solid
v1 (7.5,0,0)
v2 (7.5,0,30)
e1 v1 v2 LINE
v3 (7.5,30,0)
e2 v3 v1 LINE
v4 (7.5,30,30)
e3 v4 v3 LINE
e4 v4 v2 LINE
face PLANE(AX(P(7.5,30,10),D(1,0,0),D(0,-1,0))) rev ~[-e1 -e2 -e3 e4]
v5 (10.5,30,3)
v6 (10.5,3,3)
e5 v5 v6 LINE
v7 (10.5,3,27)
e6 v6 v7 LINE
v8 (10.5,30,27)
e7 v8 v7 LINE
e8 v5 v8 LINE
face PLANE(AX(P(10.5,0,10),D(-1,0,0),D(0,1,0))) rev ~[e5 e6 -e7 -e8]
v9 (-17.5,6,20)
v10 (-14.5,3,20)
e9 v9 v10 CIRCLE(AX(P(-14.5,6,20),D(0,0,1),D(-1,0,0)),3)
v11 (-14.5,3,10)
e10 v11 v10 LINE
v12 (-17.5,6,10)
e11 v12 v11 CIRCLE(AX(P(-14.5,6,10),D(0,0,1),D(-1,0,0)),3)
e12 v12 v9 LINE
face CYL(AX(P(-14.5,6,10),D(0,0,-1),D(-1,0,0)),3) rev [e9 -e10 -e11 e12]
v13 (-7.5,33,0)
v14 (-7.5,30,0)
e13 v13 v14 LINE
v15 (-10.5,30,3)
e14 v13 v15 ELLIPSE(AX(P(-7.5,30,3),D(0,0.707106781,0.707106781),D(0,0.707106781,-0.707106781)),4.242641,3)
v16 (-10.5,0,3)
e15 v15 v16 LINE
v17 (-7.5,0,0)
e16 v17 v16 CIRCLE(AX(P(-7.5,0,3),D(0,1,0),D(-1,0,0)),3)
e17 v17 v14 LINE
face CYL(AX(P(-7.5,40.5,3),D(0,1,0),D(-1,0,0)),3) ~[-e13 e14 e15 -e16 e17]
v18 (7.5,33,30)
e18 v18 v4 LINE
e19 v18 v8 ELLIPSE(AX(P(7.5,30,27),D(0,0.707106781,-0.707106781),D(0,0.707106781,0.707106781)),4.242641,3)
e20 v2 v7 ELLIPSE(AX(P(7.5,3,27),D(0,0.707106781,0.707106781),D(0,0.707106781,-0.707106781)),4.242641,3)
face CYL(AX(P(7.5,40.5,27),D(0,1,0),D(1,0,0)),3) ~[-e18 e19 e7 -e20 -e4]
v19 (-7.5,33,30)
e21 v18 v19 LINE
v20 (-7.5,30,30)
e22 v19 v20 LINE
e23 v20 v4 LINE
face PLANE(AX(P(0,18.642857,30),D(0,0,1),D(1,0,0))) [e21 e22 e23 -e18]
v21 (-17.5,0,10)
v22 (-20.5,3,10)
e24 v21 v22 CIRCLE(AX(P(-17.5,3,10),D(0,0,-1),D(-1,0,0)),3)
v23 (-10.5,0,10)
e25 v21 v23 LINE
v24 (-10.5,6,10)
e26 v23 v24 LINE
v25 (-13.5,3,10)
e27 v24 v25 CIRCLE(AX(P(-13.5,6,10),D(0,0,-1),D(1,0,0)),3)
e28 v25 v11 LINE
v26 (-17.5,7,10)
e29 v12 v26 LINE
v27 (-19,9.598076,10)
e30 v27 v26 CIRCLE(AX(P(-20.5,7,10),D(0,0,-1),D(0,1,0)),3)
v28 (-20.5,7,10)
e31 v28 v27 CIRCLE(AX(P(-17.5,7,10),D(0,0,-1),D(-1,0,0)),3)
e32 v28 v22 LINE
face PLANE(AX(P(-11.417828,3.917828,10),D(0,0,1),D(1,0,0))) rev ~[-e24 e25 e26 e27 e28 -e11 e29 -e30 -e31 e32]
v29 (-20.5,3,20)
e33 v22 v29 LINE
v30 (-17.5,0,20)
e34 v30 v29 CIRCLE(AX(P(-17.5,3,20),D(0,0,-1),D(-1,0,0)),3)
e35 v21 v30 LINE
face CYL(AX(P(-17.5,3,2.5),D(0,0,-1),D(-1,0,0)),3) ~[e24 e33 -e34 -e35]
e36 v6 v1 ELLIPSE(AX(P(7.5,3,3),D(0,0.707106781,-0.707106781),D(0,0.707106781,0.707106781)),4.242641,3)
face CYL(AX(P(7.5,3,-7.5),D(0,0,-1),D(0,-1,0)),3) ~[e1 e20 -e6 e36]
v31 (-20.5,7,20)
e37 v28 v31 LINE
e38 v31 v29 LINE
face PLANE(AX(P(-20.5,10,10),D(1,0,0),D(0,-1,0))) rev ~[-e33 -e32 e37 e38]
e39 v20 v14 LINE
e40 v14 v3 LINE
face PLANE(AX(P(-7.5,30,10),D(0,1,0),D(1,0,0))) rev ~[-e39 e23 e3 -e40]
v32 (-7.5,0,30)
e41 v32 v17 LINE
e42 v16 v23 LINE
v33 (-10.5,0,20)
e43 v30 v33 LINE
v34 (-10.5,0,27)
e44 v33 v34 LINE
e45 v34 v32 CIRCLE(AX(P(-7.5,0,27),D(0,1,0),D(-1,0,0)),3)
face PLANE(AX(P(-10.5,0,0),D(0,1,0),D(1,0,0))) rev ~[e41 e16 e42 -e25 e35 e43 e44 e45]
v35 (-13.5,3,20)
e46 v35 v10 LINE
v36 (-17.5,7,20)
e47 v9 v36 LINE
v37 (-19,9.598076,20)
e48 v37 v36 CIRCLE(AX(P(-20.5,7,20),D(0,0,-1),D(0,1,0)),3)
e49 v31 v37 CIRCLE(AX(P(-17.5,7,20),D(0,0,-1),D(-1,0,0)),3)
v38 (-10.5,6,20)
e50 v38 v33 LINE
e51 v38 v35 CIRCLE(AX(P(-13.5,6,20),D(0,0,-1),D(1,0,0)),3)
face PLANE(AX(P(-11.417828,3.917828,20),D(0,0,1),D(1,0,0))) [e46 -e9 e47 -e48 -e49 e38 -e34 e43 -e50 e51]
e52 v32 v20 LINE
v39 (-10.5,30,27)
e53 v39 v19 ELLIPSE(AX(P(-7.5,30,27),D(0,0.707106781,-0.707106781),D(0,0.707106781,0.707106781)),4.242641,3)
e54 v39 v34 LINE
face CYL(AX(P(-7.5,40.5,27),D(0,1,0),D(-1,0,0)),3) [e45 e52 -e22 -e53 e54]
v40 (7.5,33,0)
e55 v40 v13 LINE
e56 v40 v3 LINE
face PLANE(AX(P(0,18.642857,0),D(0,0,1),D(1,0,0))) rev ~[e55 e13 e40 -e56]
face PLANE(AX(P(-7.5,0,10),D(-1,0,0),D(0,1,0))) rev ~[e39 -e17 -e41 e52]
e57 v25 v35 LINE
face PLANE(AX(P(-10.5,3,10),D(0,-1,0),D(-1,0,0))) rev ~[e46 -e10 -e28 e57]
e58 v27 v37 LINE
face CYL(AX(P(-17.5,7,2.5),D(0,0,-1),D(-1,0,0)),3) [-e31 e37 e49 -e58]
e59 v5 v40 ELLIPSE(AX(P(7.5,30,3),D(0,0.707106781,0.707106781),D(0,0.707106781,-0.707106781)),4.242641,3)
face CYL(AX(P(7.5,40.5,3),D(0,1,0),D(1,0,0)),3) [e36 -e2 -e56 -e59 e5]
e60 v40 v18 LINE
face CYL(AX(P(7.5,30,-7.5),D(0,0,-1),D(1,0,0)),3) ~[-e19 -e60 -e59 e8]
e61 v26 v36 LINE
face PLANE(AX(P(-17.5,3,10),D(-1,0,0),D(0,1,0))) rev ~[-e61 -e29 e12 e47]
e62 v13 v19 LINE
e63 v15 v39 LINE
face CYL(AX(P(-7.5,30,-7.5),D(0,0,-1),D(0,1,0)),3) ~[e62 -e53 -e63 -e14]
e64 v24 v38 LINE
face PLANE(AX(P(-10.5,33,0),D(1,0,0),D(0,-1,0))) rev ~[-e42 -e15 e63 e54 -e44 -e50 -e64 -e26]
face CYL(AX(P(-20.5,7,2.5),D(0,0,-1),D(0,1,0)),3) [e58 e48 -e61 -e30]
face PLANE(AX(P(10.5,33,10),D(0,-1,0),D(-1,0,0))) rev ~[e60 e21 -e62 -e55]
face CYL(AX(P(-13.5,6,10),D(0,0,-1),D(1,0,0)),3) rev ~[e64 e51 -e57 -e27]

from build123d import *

# Parameters (mm, degrees)
F1_DEPTH    = 30
F2_START    = 10
F2_DEPTH    = 10
F3_T1_DEPTH = 10
F3_T3_DEPTH = 25
F3_T5_DEPTH = 48
F3_T7_DEPTH = 45


# Not quite as in the source:
# - a fillet or chamfer that OpenCascade refuses, or shapes differently, is made with other operations: its cross-section is extruded or revolved along the edge and cut away or added


with BuildPart() as f1:
    # F0 (on Top) → F1 (new body)
    with BuildSketch(Plane.XY):
        Polygon((7.5, 30), (7.5, 0), (10.5, 0), (10.5, 33), (-10.5, 33), (-10.5, 3), (-10.5, 0), (-7.5, 0), (-7.5, 30), align=None)
    extrude(amount=F1_DEPTH)

    # F0 (on Top) → F2 (join)
    with BuildSketch(Plane.XY.offset(F2_START)):
        Polygon((7.5, 30), (7.5, 0), (10.5, 0), (10.5, 33), (-10.5, 33), (-10.5, 3), (-10.5, 0), (-7.5, 0), (-7.5, 30), align=None)
        Polygon((-10.5, 0), (-10.5, 3), (-17.5, 3), (-17.5, 10), (-20.5, 10), (-20.5, 0), align=None)
    extrude(amount=F2_DEPTH)

    # F3: fillet of radius 3 on 12 edges, made by hand

    # F3_s2 → F3_t1 (join)
    with BuildSketch(Plane.XY.offset(10)):
        with BuildLine():
            ThreePointArc((-10.5, 6), (-11.3786796564, 3.8786796564), (-13.5, 3))
            Line((-13.5, 3), (-10.5, 3))
            Line((-10.5, 3), (-10.5, 6))
        make_face()
        with BuildLine():
            ThreePointArc((-17.5, 6), (-16.6213203436, 3.8786796564), (-14.5, 3))
            Line((-14.5, 3), (-17.5, 3))
            Line((-17.5, 3), (-17.5, 6))
        make_face()
    extrude(amount=F3_T1_DEPTH)

    # F3_s4 → F3_t3 (cut)
    with BuildSketch(Plane.XY.offset(2.5)):
        with BuildLine():
            ThreePointArc((-20.5, 10), (-18.3786796564, 9.1213203436), (-17.5, 7))
            Line((-17.5, 7), (-17.5, 10))
            Line((-17.5, 10), (-20.5, 10))
        make_face()
        with BuildLine():
            ThreePointArc((-20.5, 3), (-19.6213203436, 0.8786796564), (-17.5, 0))
            Line((-17.5, 0), (-20.5, 0))
            Line((-20.5, 0), (-20.5, 3))
        make_face()
        with BuildLine():
            ThreePointArc((-20.5, 7), (-19.6213203436, 9.1213203436), (-17.5, 10))
            Line((-17.5, 10), (-20.5, 10))
            Line((-20.5, 10), (-20.5, 7))
        make_face()
    extrude(amount=F3_T3_DEPTH, mode=Mode.SUBTRACT)

    # F3_s6 → F3_t5 (cut)
    with BuildSketch(Plane.XZ.offset(-40.5)):
        with BuildLine():
            ThreePointArc((-10.5, 27), (-9.6213203436, 29.1213203436), (-7.5, 30))
            Line((-7.5, 30), (-10.5, 30))
            Line((-10.5, 30), (-10.5, 27))
        make_face()
        with BuildLine():
            ThreePointArc((10.5, 3), (9.6213203436, 0.8786796564), (7.5, 0))
            Line((7.5, 0), (10.5, 0))
            Line((10.5, 0), (10.5, 3))
        make_face()
        with BuildLine():
            ThreePointArc((10.5, 27), (9.6213203436, 29.1213203436), (7.5, 30))
            Line((7.5, 30), (10.5, 30))
            Line((10.5, 30), (10.5, 27))
        make_face()
        with BuildLine():
            ThreePointArc((-10.5, 3), (-9.6213203436, 0.8786796564), (-7.5, 0))
            Line((-7.5, 0), (-10.5, 0))
            Line((-10.5, 0), (-10.5, 3))
        make_face()
    extrude(amount=F3_T5_DEPTH, mode=Mode.SUBTRACT)

    # F3_s8 → F3_t7 (cut)
    with BuildSketch(Plane.XY.offset(-7.5)):
        with BuildLine():
            ThreePointArc((7.5, 0), (9.6213203436, 0.8786796564), (10.5, 3))
            Line((10.5, 3), (10.5, 0))
            Line((10.5, 0), (7.5, 0))
        make_face()
        with BuildLine():
            ThreePointArc((10.5, 30), (9.6213203436, 32.1213203436), (7.5, 33))
            Line((7.5, 33), (10.5, 33))
            Line((10.5, 33), (10.5, 30))
        make_face()
        with BuildLine():
            ThreePointArc((-7.5, 33), (-9.6213203436, 32.1213203436), (-10.5, 30))
            Line((-10.5, 30), (-10.5, 33))
            Line((-10.5, 33), (-7.5, 33))
        make_face()
    extrude(amount=F3_T7_DEPTH, mode=Mode.SUBTRACT)


solid = f1.part
